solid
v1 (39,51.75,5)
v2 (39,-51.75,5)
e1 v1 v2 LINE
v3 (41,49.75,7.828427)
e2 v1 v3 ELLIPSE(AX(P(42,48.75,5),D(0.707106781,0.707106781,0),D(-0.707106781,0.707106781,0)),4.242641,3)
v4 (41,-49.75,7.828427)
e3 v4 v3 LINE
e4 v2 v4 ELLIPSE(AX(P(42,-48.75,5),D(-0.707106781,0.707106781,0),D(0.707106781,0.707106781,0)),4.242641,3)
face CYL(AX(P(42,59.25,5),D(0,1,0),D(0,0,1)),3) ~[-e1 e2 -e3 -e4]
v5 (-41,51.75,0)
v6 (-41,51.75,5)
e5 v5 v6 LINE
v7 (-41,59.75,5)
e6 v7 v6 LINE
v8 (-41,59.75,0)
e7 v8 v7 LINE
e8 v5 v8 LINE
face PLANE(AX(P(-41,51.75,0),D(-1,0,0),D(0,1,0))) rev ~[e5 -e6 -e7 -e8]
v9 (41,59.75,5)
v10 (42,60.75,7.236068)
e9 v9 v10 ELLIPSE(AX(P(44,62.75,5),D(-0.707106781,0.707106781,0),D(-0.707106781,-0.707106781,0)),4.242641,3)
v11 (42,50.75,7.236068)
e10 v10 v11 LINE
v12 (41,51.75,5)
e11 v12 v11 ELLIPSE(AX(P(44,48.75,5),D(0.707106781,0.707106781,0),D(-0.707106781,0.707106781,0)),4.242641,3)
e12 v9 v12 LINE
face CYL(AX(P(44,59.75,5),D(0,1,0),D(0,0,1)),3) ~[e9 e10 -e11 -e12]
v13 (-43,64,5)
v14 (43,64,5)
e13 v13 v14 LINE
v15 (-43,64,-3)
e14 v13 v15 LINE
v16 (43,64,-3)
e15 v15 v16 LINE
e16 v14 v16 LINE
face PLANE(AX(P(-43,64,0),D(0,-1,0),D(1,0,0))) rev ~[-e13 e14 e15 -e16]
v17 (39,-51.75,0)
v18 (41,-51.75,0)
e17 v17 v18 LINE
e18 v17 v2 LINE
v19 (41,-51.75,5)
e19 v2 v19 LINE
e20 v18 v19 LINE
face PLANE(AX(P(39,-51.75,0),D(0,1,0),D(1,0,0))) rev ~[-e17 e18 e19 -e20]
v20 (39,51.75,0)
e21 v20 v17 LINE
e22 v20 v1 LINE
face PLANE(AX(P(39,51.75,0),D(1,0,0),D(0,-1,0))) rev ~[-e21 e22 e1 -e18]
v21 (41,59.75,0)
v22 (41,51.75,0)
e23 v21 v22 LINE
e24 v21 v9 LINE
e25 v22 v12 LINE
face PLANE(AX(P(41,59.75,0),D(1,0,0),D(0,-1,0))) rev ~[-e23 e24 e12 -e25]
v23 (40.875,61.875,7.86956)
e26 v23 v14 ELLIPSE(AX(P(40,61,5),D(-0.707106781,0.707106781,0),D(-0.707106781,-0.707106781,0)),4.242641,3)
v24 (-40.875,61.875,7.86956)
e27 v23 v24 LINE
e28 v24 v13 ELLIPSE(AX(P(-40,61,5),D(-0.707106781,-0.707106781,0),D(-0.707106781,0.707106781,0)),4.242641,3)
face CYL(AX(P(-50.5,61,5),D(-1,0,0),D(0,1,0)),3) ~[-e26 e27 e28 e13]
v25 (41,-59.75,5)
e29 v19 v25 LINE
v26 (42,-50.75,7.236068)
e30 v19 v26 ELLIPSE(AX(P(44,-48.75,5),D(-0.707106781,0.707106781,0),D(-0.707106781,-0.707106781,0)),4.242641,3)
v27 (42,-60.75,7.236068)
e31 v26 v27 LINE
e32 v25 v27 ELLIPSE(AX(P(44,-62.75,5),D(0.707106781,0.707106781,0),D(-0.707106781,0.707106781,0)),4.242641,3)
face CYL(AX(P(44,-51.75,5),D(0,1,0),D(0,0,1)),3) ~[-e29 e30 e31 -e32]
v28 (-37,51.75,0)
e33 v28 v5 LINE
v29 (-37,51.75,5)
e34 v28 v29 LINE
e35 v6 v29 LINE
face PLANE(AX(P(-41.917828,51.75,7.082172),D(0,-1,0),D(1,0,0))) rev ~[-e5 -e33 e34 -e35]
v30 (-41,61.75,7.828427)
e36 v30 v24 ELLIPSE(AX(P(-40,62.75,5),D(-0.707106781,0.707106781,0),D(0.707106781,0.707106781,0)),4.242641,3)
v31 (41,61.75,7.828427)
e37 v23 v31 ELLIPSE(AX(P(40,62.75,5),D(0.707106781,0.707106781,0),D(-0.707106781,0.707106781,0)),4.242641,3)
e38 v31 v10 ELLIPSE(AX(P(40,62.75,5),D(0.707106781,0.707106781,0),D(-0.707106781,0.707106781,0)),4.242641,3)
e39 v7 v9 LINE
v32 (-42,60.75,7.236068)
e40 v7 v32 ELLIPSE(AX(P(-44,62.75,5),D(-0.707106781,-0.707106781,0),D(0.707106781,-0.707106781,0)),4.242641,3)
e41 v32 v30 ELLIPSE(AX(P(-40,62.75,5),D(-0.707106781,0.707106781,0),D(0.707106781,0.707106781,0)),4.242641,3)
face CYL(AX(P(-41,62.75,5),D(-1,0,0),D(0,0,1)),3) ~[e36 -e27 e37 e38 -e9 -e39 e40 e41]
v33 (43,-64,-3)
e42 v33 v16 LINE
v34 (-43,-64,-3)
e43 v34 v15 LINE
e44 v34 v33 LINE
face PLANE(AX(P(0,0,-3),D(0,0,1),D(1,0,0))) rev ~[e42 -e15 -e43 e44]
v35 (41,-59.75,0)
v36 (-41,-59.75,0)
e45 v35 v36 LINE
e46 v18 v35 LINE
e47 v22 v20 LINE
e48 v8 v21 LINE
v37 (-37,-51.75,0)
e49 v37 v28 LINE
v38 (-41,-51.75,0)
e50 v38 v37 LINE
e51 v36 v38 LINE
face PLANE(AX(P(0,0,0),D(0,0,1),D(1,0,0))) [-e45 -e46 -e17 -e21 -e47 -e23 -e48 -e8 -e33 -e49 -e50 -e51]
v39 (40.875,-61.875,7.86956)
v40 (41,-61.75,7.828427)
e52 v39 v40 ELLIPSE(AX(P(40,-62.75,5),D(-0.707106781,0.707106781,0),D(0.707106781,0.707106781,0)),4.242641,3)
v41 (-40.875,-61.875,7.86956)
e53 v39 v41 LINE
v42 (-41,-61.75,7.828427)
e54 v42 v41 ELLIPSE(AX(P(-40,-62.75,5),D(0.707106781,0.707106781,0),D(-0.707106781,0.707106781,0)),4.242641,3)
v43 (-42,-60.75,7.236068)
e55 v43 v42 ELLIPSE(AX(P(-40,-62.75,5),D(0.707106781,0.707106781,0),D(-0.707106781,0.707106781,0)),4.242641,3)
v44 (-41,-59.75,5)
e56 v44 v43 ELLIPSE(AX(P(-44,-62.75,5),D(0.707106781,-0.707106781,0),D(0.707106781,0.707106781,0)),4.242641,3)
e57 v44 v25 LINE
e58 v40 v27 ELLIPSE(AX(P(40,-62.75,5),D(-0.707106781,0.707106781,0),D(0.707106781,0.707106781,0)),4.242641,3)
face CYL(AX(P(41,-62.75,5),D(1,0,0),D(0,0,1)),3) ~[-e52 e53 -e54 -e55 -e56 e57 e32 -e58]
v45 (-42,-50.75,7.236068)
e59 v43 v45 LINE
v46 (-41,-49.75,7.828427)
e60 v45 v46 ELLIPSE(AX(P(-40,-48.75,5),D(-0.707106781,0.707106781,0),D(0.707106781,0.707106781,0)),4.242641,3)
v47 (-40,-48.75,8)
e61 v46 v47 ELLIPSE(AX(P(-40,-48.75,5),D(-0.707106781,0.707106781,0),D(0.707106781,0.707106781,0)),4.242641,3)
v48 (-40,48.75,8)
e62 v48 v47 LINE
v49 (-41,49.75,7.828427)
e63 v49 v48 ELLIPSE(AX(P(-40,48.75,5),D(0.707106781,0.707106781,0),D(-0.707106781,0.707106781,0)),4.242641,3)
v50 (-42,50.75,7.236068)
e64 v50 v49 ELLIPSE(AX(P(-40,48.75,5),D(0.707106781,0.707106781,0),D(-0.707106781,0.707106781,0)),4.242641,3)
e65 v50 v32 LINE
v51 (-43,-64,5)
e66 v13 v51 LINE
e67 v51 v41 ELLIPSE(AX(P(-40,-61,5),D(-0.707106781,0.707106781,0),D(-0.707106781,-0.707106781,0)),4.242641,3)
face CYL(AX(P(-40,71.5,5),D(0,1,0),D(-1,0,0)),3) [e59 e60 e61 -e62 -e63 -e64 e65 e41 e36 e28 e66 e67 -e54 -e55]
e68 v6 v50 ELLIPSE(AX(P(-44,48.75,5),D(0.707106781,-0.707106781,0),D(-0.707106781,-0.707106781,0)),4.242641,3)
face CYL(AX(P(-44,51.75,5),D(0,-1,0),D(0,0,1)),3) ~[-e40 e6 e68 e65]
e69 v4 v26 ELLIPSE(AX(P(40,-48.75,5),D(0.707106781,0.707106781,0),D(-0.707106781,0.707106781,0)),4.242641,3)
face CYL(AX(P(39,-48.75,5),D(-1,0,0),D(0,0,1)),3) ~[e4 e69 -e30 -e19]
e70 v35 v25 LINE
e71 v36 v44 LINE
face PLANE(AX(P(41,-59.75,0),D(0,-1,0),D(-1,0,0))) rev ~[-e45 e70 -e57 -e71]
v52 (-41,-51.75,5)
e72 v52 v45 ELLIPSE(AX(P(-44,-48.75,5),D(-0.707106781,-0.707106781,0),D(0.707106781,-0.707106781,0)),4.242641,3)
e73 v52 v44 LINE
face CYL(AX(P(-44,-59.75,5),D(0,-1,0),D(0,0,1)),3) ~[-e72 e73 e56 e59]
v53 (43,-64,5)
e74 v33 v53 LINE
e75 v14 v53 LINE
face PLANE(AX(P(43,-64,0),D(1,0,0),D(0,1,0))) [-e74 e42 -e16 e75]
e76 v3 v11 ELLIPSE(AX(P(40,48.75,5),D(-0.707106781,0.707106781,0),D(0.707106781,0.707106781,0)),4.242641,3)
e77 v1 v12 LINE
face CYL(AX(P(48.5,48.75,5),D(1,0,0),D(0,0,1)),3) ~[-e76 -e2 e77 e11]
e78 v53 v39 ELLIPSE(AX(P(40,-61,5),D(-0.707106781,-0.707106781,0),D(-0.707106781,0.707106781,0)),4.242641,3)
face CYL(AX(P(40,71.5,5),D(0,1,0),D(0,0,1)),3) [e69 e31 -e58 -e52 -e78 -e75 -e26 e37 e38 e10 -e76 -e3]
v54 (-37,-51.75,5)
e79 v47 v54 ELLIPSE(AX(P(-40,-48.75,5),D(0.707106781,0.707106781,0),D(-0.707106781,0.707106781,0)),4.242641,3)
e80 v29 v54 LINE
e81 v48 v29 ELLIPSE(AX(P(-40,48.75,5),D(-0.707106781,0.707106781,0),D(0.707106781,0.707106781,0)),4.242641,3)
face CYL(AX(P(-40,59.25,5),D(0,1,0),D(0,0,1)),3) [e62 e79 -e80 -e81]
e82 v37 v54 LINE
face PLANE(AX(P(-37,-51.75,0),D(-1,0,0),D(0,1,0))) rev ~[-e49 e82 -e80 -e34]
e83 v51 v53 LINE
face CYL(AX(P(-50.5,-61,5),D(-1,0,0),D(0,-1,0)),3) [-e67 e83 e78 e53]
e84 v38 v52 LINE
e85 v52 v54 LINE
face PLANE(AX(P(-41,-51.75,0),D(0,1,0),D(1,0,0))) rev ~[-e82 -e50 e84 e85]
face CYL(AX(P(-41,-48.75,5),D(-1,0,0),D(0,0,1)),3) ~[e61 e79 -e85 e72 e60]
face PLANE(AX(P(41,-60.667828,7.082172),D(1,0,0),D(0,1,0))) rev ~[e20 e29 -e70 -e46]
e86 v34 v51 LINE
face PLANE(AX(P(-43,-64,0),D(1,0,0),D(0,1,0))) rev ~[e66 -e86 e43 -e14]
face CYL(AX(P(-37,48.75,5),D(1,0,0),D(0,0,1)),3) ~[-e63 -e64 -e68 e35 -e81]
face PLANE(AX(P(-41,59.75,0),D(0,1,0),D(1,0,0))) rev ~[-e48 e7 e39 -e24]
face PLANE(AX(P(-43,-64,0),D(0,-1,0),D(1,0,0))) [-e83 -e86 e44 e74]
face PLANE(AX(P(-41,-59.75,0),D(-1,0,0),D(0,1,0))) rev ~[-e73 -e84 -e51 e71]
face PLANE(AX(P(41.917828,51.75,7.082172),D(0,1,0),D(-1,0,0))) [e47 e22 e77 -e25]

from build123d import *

# Parameters (mm, degrees)
F1_W          = 86
F1_H          = 128
F2_DEPTH      = 8
F0_W          = 86
F0_H          = 128
F3_DEPTH      = 3
F4_T1_DEPTH   = 118.5
F4_T3_DEPTH   = 101
F4_T5_DEPTH   = 143
F4_T7_DEPTH   = 8
F4_T9_DEPTH   = 82
F4_T11_DEPTH  = 9.5
F4_T13_DEPTH  = 8
F4_T15_DEPTH  = 11.5
F4_T21_DEPTH  = 15.5
F4_T26_DEPTH  = 11.5
F4_T34_DEPTH  = 15.5
F4_T40_DEPTH  = 89.5
F4_T48_DEPTH  = 89.5
F4_T53_DEPTH  = 15.5
F4_T62_DEPTH  = 15.5
F4_T67_DEPTH  = 9.5
F4_T75_DEPTH  = 9.5
F4_T80_DEPTH  = 15.5
F4_T88_DEPTH  = 15.5
F4_T94_DEPTH  = 89.5
F4_T102_DEPTH = 89.5
F4_T107_DEPTH = 15.5
F4_T116_DEPTH = 15.5
F4_T121_DEPTH = 11.5


# Not quite as in the source:
# - a fillet or chamfer that OpenCascade refuses, or shapes differently, is made with other operations: its cross-section is extruded or revolved along the edge and cut away or added


with BuildPart() as f2:
    # F1 (on face) → F2 (new body)
    with BuildSketch(Plane.XY):
        Rectangle(F1_W, F1_H)
        Polygon((-41, 51.75), (-41, 59.75), (41, 59.75), (41, 51.75), (39, 51.75), (39, -51.75), (41, -51.75), (41, -59.75), (-41, -59.75), (-41, -51.75), (-37, -51.75), (-37, 51.75), align=None, mode=Mode.SUBTRACT)
    extrude(amount=F2_DEPTH)

    # F0 (on Top) → F3 (join)
    with BuildSketch(Plane.XY):
        Rectangle(F0_W, F0_H)
    extrude(amount=-F3_DEPTH)

    # F4: fillet of radius 3 on 16 edges, made by hand

    # F4_s2 → F4_t1 (cut)
    with BuildSketch(Plane.XZ.offset(-59.25)):
        with BuildLine():
            ThreePointArc((-40, 8), (-37.8786796564, 7.1213203436), (-37, 5))
            Line((-37, 5), (-37, 8))
            Line((-37, 8), (-40, 8))
        make_face()
        with BuildLine():
            ThreePointArc((42, 8), (39.8786796564, 7.1213203436), (39, 5))
            Line((39, 5), (39, 8))
            Line((39, 8), (42, 8))
        make_face()
    extrude(amount=F4_T1_DEPTH, mode=Mode.SUBTRACT)

    # F4_s4 → F4_t3 (cut)
    with BuildSketch(Plane.YZ.offset(-50.5)):
        with BuildLine():
            ThreePointArc((64, 5), (63.1213203436, 7.1213203436), (61, 8))
            Line((61, 8), (64, 8))
            Line((64, 8), (64, 5))
        make_face()
        with BuildLine():
            ThreePointArc((-64, 5), (-63.1213203436, 7.1213203436), (-61, 8))
            Line((-61, 8), (-64, 8))
            Line((-64, 8), (-64, 5))
        make_face()
    extrude(amount=F4_T3_DEPTH, mode=Mode.SUBTRACT)

    # F4_s6 → F4_t5 (cut)
    with BuildSketch(Plane.XZ.offset(-71.5)):
        with BuildLine():
            ThreePointArc((-43, 5), (-42.1213203436, 7.1213203436), (-40, 8))
            Line((-40, 8), (-43, 8))
            Line((-43, 8), (-43, 5))
        make_face()
        with BuildLine():
            ThreePointArc((40, 8), (42.1213203436, 7.1213203436), (43, 5))
            Line((43, 5), (43, 8))
            Line((43, 8), (40, 8))
        make_face()
    extrude(amount=F4_T5_DEPTH, mode=Mode.SUBTRACT)

    # F4_s8 → F4_t7 (cut)
    with BuildSketch(Plane.XZ.offset(-59.75)):
        with BuildLine():
            ThreePointArc((-44, 8), (-41.8786796564, 7.1213203436), (-41, 5))
            Line((-41, 5), (-41, 8))
            Line((-41, 8), (-44, 8))
        make_face()
        with BuildLine():
            ThreePointArc((44, 8), (41.8786796564, 7.1213203436), (41, 5))
            Line((41, 5), (41, 8))
            Line((41, 8), (44, 8))
        make_face()
    extrude(amount=F4_T7_DEPTH, mode=Mode.SUBTRACT)

    # F4_s10 → F4_t9 (cut)
    with BuildSketch(Plane.YZ.offset(-41)):
        with BuildLine():
            ThreePointArc((62.75, 8), (60.6286796564, 7.1213203436), (59.75, 5))
            Line((59.75, 5), (59.75, 8))
            Line((59.75, 8), (62.75, 8))
        make_face()
        with BuildLine():
            ThreePointArc((-62.75, 8), (-60.6286796564, 7.1213203436), (-59.75, 5))
            Line((-59.75, 5), (-59.75, 8))
            Line((-59.75, 8), (-62.75, 8))
        make_face()
    extrude(amount=F4_T9_DEPTH, mode=Mode.SUBTRACT)

    # F4_s12 → F4_t11 (cut)
    with BuildSketch(Plane.YZ.offset(31.5)):
        with BuildLine():
            ThreePointArc((48.75, 8), (50.8713203436, 7.1213203436), (51.75, 5))
            Line((51.75, 5), (51.75, 8))
            Line((51.75, 8), (48.75, 8))
        make_face()
        with BuildLine():
            ThreePointArc((-48.75, 8), (-50.8713203436, 7.1213203436), (-51.75, 5))
            Line((-51.75, 5), (-51.75, 8))
            Line((-51.75, 8), (-48.75, 8))
        make_face()
    extrude(amount=F4_T11_DEPTH, mode=Mode.SUBTRACT)

    # F4_s14 → F4_t13 (cut)
    with BuildSketch(Plane.XZ.offset(51.75)):
        with BuildLine():
            ThreePointArc((44, 8), (41.8786796564, 7.1213203436), (41, 5))
            Line((41, 5), (41, 8))
            Line((41, 8), (44, 8))
        make_face()
        with BuildLine():
            ThreePointArc((-44, 8), (-41.8786796564, 7.1213203436), (-41, 5))
            Line((-41, 5), (-41, 8))
            Line((-41, 8), (-44, 8))
        make_face()
    extrude(amount=F4_T13_DEPTH, mode=Mode.SUBTRACT)

    # F4_s16 → F4_t15 (cut)
    with BuildSketch(Plane.YZ.offset(-41)):
        with BuildLine():
            ThreePointArc((-48.75, 8), (-50.8713203436, 7.1213203436), (-51.75, 5))
            Line((-51.75, 5), (-51.75, 8))
            Line((-51.75, 8), (-48.75, 8))
        make_face()
        with BuildLine():
            ThreePointArc((48.75, 8), (50.8713203436, 7.1213203436), (51.75, 5))
            Line((51.75, 5), (51.75, 8))
            Line((51.75, 8), (48.75, 8))
        make_face()
    extrude(amount=F4_T15_DEPTH, mode=Mode.SUBTRACT)


with BuildPart() as f4_tool19:
    # F4_s20 → F4_t21 (new body)
    with BuildSketch(Plane.XZ.offset(-44.25)):
        with BuildLine():
            ThreePointArc((-44, 8), (-41.8786796564, 7.1213203436), (-41, 5))
            Line((-41, 5), (-41, 8))
            Line((-41, 8), (-44, 8))
        make_face()
    extrude(amount=-F4_T21_DEPTH)

    split(bisect_by=Plane.YZ.offset(-43), keep=Keep.TOP)

    split(bisect_by=Plane.XZ.offset(-51.75), keep=Keep.TOP)


with BuildPart() as f4_tool24:
    # F4_s25 → F4_t26 (new body)
    with BuildSketch(Plane.YZ.offset(-37)):
        with BuildLine():
            ThreePointArc((48.75, 8), (50.8713203436, 7.1213203436), (51.75, 5))
            Line((51.75, 5), (51.75, 8))
            Line((51.75, 8), (48.75, 8))
        make_face()
    extrude(amount=-F4_T26_DEPTH)

    split(bisect_by=Plane.YZ.offset(-43), keep=Keep.TOP)

    split(bisect_by=Plane.YZ.offset(-41), keep=Keep.BOTTOM)


with BuildPart() as f4_tool19_1:
    add(f4_tool19.part)

    # F4_t29: intersect F4_tool24
    add(f4_tool24.part, mode=Mode.INTERSECT)


with BuildPart() as f2_1:
    add(f2.part)

    # F4_t17: cut F4_tool19
    add(f4_tool19_1.part, mode=Mode.SUBTRACT)


with BuildPart() as f4_tool32:
    # F4_s33 → F4_t34 (new body)
    with BuildSketch(Plane.XZ.offset(-51.75)):
        with BuildLine():
            ThreePointArc((-44, 8), (-41.8786796564, 7.1213203436), (-41, 5))
            Line((-41, 5), (-41, 8))
            Line((-41, 8), (-44, 8))
        make_face()
    extrude(amount=-F4_T34_DEPTH)

    split(bisect_by=Plane.XZ.offset(-64), keep=Keep.TOP)

    split(bisect_by=Plane.YZ.offset(-43), keep=Keep.TOP)

    split(bisect_by=Plane.XZ.offset(-59.75), keep=Keep.BOTTOM)


with BuildPart() as f4_tool38:
    # F4_s39 → F4_t40 (new body)
    with BuildSketch(Plane.YZ.offset(-48.5)):
        with BuildLine():
            ThreePointArc((62.75, 8), (60.6286796564, 7.1213203436), (59.75, 5))
            Line((59.75, 5), (59.75, 8))
            Line((59.75, 8), (62.75, 8))
        make_face()
    extrude(amount=F4_T40_DEPTH)

    split(bisect_by=Plane.YZ.offset(-43), keep=Keep.TOP)

    split(bisect_by=Plane.YZ.offset(-41), keep=Keep.BOTTOM)


with BuildPart() as f4_tool32_1:
    add(f4_tool32.part)

    # F4_t43: intersect F4_tool38
    add(f4_tool38.part, mode=Mode.INTERSECT)


with BuildPart() as f2_2:
    add(f2_1.part)

    # F4_t30: cut F4_tool32
    add(f4_tool32_1.part, mode=Mode.SUBTRACT)


with BuildPart() as f4_tool46:
    # F4_s47 → F4_t48 (new body)
    with BuildSketch(Plane.YZ.offset(-41)):
        with BuildLine():
            ThreePointArc((62.75, 8), (60.6286796564, 7.1213203436), (59.75, 5))
            Line((59.75, 5), (59.75, 8))
            Line((59.75, 8), (62.75, 8))
        make_face()
    extrude(amount=F4_T48_DEPTH)

    split(bisect_by=Plane.YZ.offset(41), keep=Keep.TOP)

    split(bisect_by=Plane.YZ.offset(43), keep=Keep.BOTTOM)


with BuildPart() as f4_tool51:
    # F4_s52 → F4_t53 (new body)
    with BuildSketch(Plane.XZ.offset(-67.25)):
        with BuildLine():
            ThreePointArc((44, 8), (41.8786796564, 7.1213203436), (41, 5))
            Line((41, 5), (41, 8))
            Line((41, 8), (44, 8))
        make_face()
    extrude(amount=F4_T53_DEPTH)

    split(bisect_by=Plane.XZ.offset(-64), keep=Keep.TOP)

    split(bisect_by=Plane.XZ.offset(-59.75), keep=Keep.BOTTOM)

    split(bisect_by=Plane.YZ.offset(43), keep=Keep.BOTTOM)


with BuildPart() as f4_tool46_1:
    add(f4_tool46.part)

    # F4_t57: intersect F4_tool51
    add(f4_tool51.part, mode=Mode.INTERSECT)


with BuildPart() as f2_3:
    add(f2_2.part)

    # F4_t44: cut F4_tool46
    add(f4_tool46_1.part, mode=Mode.SUBTRACT)


with BuildPart() as f4_tool60:
    # F4_s61 → F4_t62 (new body)
    with BuildSketch(Plane.XZ.offset(-59.75)):
        with BuildLine():
            ThreePointArc((44, 8), (41.8786796564, 7.1213203436), (41, 5))
            Line((41, 5), (41, 8))
            Line((41, 8), (44, 8))
        make_face()
    extrude(amount=F4_T62_DEPTH)

    split(bisect_by=Plane.XZ.offset(-51.75), keep=Keep.TOP)

    split(bisect_by=Plane.YZ.offset(43), keep=Keep.BOTTOM)


with BuildPart() as f4_tool65:
    # F4_s66 → F4_t67 (new body)
    with BuildSketch(Plane.YZ.offset(48.5)):
        with BuildLine():
            ThreePointArc((48.75, 8), (50.8713203436, 7.1213203436), (51.75, 5))
            Line((51.75, 5), (51.75, 8))
            Line((51.75, 8), (48.75, 8))
        make_face()
    extrude(amount=-F4_T67_DEPTH)

    split(bisect_by=Plane.YZ.offset(41), keep=Keep.TOP)

    split(bisect_by=Plane.YZ.offset(43), keep=Keep.BOTTOM)


with BuildPart() as f4_tool60_1:
    add(f4_tool60.part)

    # F4_t70: intersect F4_tool65
    add(f4_tool65.part, mode=Mode.INTERSECT)


with BuildPart() as f2_4:
    add(f2_3.part)

    # F4_t58: cut F4_tool60
    add(f4_tool60_1.part, mode=Mode.SUBTRACT)


with BuildPart() as f4_tool73:
    # F4_s74 → F4_t75 (new body)
    with BuildSketch(Plane.YZ.offset(39)):
        with BuildLine():
            ThreePointArc((-48.75, 8), (-50.8713203436, 7.1213203436), (-51.75, 5))
            Line((-51.75, 5), (-51.75, 8))
            Line((-51.75, 8), (-48.75, 8))
        make_face()
    extrude(amount=F4_T75_DEPTH)

    split(bisect_by=Plane.YZ.offset(41), keep=Keep.TOP)

    split(bisect_by=Plane.YZ.offset(43), keep=Keep.BOTTOM)


with BuildPart() as f4_tool78:
    # F4_s79 → F4_t80 (new body)
    with BuildSketch(Plane.XZ.offset(44.25)):
        with BuildLine():
            ThreePointArc((44, 8), (41.8786796564, 7.1213203436), (41, 5))
            Line((41, 5), (41, 8))
            Line((41, 8), (44, 8))
        make_face()
    extrude(amount=F4_T80_DEPTH)

    split(bisect_by=Plane.XZ.offset(51.75), keep=Keep.BOTTOM)

    split(bisect_by=Plane.YZ.offset(43), keep=Keep.BOTTOM)


with BuildPart() as f4_tool73_1:
    add(f4_tool73.part)

    # F4_t83: intersect F4_tool78
    add(f4_tool78.part, mode=Mode.INTERSECT)


with BuildPart() as f2_5:
    add(f2_4.part)

    # F4_t71: cut F4_tool73
    add(f4_tool73_1.part, mode=Mode.SUBTRACT)


with BuildPart() as f4_tool86:
    # F4_s87 → F4_t88 (new body)
    with BuildSketch(Plane.XZ.offset(51.75)):
        with BuildLine():
            ThreePointArc((44, 8), (41.8786796564, 7.1213203436), (41, 5))
            Line((41, 5), (41, 8))
            Line((41, 8), (44, 8))
        make_face()
    extrude(amount=F4_T88_DEPTH)

    split(bisect_by=Plane.XZ.offset(64), keep=Keep.BOTTOM)

    split(bisect_by=Plane.XZ.offset(59.75), keep=Keep.TOP)

    split(bisect_by=Plane.YZ.offset(43), keep=Keep.BOTTOM)


with BuildPart() as f4_tool92:
    # F4_s93 → F4_t94 (new body)
    with BuildSketch(Plane.YZ.offset(48.5)):
        with BuildLine():
            ThreePointArc((-62.75, 8), (-60.6286796564, 7.1213203436), (-59.75, 5))
            Line((-59.75, 5), (-59.75, 8))
            Line((-59.75, 8), (-62.75, 8))
        make_face()
    extrude(amount=-F4_T94_DEPTH)

    split(bisect_by=Plane.YZ.offset(41), keep=Keep.TOP)

    split(bisect_by=Plane.YZ.offset(43), keep=Keep.BOTTOM)


with BuildPart() as f4_tool86_1:
    add(f4_tool86.part)

    # F4_t97: intersect F4_tool92
    add(f4_tool92.part, mode=Mode.INTERSECT)


with BuildPart() as f2_6:
    add(f2_5.part)

    # F4_t84: cut F4_tool86
    add(f4_tool86_1.part, mode=Mode.SUBTRACT)


with BuildPart() as f4_tool100:
    # F4_s101 → F4_t102 (new body)
    with BuildSketch(Plane.YZ.offset(41)):
        with BuildLine():
            ThreePointArc((-62.75, 8), (-60.6286796564, 7.1213203436), (-59.75, 5))
            Line((-59.75, 5), (-59.75, 8))
            Line((-59.75, 8), (-62.75, 8))
        make_face()
    extrude(amount=-F4_T102_DEPTH)

    split(bisect_by=Plane.YZ.offset(-43), keep=Keep.TOP)

    split(bisect_by=Plane.YZ.offset(-41), keep=Keep.BOTTOM)


with BuildPart() as f4_tool105:
    # F4_s106 → F4_t107 (new body)
    with BuildSketch(Plane.XZ.offset(67.25)):
        with BuildLine():
            ThreePointArc((-44, 8), (-41.8786796564, 7.1213203436), (-41, 5))
            Line((-41, 5), (-41, 8))
            Line((-41, 8), (-44, 8))
        make_face()
    extrude(amount=-F4_T107_DEPTH)

    split(bisect_by=Plane.XZ.offset(64), keep=Keep.BOTTOM)

    split(bisect_by=Plane.YZ.offset(-43), keep=Keep.TOP)

    split(bisect_by=Plane.XZ.offset(59.75), keep=Keep.TOP)


with BuildPart() as f4_tool100_1:
    add(f4_tool100.part)

    # F4_t111: intersect F4_tool105
    add(f4_tool105.part, mode=Mode.INTERSECT)


with BuildPart() as f2_7:
    add(f2_6.part)

    # F4_t98: cut F4_tool100
    add(f4_tool100_1.part, mode=Mode.SUBTRACT)


with BuildPart() as f4_tool114:
    # F4_s115 → F4_t116 (new body)
    with BuildSketch(Plane.XZ.offset(59.75)):
        with BuildLine():
            ThreePointArc((-44, 8), (-41.8786796564, 7.1213203436), (-41, 5))
            Line((-41, 5), (-41, 8))
            Line((-41, 8), (-44, 8))
        make_face()
    extrude(amount=-F4_T116_DEPTH)

    split(bisect_by=Plane.YZ.offset(-43), keep=Keep.TOP)

    split(bisect_by=Plane.XZ.offset(51.75), keep=Keep.BOTTOM)


with BuildPart() as f4_tool119:
    # F4_s120 → F4_t121 (new body)
    with BuildSketch(Plane.YZ.offset(-48.5)):
        with BuildLine():
            ThreePointArc((-48.75, 8), (-50.8713203436, 7.1213203436), (-51.75, 5))
            Line((-51.75, 5), (-51.75, 8))
            Line((-51.75, 8), (-48.75, 8))
        make_face()
    extrude(amount=F4_T121_DEPTH)

    split(bisect_by=Plane.YZ.offset(-43), keep=Keep.TOP)

    split(bisect_by=Plane.YZ.offset(-41), keep=Keep.BOTTOM)


with BuildPart() as f4_tool114_1:
    add(f4_tool114.part)

    # F4_t124: intersect F4_tool119
    add(f4_tool119.part, mode=Mode.INTERSECT)


with BuildPart() as f2_8:
    add(f2_7.part)

    # F4_t112: cut F4_tool114
    add(f4_tool114_1.part, mode=Mode.SUBTRACT)


solid = f2_8.part
